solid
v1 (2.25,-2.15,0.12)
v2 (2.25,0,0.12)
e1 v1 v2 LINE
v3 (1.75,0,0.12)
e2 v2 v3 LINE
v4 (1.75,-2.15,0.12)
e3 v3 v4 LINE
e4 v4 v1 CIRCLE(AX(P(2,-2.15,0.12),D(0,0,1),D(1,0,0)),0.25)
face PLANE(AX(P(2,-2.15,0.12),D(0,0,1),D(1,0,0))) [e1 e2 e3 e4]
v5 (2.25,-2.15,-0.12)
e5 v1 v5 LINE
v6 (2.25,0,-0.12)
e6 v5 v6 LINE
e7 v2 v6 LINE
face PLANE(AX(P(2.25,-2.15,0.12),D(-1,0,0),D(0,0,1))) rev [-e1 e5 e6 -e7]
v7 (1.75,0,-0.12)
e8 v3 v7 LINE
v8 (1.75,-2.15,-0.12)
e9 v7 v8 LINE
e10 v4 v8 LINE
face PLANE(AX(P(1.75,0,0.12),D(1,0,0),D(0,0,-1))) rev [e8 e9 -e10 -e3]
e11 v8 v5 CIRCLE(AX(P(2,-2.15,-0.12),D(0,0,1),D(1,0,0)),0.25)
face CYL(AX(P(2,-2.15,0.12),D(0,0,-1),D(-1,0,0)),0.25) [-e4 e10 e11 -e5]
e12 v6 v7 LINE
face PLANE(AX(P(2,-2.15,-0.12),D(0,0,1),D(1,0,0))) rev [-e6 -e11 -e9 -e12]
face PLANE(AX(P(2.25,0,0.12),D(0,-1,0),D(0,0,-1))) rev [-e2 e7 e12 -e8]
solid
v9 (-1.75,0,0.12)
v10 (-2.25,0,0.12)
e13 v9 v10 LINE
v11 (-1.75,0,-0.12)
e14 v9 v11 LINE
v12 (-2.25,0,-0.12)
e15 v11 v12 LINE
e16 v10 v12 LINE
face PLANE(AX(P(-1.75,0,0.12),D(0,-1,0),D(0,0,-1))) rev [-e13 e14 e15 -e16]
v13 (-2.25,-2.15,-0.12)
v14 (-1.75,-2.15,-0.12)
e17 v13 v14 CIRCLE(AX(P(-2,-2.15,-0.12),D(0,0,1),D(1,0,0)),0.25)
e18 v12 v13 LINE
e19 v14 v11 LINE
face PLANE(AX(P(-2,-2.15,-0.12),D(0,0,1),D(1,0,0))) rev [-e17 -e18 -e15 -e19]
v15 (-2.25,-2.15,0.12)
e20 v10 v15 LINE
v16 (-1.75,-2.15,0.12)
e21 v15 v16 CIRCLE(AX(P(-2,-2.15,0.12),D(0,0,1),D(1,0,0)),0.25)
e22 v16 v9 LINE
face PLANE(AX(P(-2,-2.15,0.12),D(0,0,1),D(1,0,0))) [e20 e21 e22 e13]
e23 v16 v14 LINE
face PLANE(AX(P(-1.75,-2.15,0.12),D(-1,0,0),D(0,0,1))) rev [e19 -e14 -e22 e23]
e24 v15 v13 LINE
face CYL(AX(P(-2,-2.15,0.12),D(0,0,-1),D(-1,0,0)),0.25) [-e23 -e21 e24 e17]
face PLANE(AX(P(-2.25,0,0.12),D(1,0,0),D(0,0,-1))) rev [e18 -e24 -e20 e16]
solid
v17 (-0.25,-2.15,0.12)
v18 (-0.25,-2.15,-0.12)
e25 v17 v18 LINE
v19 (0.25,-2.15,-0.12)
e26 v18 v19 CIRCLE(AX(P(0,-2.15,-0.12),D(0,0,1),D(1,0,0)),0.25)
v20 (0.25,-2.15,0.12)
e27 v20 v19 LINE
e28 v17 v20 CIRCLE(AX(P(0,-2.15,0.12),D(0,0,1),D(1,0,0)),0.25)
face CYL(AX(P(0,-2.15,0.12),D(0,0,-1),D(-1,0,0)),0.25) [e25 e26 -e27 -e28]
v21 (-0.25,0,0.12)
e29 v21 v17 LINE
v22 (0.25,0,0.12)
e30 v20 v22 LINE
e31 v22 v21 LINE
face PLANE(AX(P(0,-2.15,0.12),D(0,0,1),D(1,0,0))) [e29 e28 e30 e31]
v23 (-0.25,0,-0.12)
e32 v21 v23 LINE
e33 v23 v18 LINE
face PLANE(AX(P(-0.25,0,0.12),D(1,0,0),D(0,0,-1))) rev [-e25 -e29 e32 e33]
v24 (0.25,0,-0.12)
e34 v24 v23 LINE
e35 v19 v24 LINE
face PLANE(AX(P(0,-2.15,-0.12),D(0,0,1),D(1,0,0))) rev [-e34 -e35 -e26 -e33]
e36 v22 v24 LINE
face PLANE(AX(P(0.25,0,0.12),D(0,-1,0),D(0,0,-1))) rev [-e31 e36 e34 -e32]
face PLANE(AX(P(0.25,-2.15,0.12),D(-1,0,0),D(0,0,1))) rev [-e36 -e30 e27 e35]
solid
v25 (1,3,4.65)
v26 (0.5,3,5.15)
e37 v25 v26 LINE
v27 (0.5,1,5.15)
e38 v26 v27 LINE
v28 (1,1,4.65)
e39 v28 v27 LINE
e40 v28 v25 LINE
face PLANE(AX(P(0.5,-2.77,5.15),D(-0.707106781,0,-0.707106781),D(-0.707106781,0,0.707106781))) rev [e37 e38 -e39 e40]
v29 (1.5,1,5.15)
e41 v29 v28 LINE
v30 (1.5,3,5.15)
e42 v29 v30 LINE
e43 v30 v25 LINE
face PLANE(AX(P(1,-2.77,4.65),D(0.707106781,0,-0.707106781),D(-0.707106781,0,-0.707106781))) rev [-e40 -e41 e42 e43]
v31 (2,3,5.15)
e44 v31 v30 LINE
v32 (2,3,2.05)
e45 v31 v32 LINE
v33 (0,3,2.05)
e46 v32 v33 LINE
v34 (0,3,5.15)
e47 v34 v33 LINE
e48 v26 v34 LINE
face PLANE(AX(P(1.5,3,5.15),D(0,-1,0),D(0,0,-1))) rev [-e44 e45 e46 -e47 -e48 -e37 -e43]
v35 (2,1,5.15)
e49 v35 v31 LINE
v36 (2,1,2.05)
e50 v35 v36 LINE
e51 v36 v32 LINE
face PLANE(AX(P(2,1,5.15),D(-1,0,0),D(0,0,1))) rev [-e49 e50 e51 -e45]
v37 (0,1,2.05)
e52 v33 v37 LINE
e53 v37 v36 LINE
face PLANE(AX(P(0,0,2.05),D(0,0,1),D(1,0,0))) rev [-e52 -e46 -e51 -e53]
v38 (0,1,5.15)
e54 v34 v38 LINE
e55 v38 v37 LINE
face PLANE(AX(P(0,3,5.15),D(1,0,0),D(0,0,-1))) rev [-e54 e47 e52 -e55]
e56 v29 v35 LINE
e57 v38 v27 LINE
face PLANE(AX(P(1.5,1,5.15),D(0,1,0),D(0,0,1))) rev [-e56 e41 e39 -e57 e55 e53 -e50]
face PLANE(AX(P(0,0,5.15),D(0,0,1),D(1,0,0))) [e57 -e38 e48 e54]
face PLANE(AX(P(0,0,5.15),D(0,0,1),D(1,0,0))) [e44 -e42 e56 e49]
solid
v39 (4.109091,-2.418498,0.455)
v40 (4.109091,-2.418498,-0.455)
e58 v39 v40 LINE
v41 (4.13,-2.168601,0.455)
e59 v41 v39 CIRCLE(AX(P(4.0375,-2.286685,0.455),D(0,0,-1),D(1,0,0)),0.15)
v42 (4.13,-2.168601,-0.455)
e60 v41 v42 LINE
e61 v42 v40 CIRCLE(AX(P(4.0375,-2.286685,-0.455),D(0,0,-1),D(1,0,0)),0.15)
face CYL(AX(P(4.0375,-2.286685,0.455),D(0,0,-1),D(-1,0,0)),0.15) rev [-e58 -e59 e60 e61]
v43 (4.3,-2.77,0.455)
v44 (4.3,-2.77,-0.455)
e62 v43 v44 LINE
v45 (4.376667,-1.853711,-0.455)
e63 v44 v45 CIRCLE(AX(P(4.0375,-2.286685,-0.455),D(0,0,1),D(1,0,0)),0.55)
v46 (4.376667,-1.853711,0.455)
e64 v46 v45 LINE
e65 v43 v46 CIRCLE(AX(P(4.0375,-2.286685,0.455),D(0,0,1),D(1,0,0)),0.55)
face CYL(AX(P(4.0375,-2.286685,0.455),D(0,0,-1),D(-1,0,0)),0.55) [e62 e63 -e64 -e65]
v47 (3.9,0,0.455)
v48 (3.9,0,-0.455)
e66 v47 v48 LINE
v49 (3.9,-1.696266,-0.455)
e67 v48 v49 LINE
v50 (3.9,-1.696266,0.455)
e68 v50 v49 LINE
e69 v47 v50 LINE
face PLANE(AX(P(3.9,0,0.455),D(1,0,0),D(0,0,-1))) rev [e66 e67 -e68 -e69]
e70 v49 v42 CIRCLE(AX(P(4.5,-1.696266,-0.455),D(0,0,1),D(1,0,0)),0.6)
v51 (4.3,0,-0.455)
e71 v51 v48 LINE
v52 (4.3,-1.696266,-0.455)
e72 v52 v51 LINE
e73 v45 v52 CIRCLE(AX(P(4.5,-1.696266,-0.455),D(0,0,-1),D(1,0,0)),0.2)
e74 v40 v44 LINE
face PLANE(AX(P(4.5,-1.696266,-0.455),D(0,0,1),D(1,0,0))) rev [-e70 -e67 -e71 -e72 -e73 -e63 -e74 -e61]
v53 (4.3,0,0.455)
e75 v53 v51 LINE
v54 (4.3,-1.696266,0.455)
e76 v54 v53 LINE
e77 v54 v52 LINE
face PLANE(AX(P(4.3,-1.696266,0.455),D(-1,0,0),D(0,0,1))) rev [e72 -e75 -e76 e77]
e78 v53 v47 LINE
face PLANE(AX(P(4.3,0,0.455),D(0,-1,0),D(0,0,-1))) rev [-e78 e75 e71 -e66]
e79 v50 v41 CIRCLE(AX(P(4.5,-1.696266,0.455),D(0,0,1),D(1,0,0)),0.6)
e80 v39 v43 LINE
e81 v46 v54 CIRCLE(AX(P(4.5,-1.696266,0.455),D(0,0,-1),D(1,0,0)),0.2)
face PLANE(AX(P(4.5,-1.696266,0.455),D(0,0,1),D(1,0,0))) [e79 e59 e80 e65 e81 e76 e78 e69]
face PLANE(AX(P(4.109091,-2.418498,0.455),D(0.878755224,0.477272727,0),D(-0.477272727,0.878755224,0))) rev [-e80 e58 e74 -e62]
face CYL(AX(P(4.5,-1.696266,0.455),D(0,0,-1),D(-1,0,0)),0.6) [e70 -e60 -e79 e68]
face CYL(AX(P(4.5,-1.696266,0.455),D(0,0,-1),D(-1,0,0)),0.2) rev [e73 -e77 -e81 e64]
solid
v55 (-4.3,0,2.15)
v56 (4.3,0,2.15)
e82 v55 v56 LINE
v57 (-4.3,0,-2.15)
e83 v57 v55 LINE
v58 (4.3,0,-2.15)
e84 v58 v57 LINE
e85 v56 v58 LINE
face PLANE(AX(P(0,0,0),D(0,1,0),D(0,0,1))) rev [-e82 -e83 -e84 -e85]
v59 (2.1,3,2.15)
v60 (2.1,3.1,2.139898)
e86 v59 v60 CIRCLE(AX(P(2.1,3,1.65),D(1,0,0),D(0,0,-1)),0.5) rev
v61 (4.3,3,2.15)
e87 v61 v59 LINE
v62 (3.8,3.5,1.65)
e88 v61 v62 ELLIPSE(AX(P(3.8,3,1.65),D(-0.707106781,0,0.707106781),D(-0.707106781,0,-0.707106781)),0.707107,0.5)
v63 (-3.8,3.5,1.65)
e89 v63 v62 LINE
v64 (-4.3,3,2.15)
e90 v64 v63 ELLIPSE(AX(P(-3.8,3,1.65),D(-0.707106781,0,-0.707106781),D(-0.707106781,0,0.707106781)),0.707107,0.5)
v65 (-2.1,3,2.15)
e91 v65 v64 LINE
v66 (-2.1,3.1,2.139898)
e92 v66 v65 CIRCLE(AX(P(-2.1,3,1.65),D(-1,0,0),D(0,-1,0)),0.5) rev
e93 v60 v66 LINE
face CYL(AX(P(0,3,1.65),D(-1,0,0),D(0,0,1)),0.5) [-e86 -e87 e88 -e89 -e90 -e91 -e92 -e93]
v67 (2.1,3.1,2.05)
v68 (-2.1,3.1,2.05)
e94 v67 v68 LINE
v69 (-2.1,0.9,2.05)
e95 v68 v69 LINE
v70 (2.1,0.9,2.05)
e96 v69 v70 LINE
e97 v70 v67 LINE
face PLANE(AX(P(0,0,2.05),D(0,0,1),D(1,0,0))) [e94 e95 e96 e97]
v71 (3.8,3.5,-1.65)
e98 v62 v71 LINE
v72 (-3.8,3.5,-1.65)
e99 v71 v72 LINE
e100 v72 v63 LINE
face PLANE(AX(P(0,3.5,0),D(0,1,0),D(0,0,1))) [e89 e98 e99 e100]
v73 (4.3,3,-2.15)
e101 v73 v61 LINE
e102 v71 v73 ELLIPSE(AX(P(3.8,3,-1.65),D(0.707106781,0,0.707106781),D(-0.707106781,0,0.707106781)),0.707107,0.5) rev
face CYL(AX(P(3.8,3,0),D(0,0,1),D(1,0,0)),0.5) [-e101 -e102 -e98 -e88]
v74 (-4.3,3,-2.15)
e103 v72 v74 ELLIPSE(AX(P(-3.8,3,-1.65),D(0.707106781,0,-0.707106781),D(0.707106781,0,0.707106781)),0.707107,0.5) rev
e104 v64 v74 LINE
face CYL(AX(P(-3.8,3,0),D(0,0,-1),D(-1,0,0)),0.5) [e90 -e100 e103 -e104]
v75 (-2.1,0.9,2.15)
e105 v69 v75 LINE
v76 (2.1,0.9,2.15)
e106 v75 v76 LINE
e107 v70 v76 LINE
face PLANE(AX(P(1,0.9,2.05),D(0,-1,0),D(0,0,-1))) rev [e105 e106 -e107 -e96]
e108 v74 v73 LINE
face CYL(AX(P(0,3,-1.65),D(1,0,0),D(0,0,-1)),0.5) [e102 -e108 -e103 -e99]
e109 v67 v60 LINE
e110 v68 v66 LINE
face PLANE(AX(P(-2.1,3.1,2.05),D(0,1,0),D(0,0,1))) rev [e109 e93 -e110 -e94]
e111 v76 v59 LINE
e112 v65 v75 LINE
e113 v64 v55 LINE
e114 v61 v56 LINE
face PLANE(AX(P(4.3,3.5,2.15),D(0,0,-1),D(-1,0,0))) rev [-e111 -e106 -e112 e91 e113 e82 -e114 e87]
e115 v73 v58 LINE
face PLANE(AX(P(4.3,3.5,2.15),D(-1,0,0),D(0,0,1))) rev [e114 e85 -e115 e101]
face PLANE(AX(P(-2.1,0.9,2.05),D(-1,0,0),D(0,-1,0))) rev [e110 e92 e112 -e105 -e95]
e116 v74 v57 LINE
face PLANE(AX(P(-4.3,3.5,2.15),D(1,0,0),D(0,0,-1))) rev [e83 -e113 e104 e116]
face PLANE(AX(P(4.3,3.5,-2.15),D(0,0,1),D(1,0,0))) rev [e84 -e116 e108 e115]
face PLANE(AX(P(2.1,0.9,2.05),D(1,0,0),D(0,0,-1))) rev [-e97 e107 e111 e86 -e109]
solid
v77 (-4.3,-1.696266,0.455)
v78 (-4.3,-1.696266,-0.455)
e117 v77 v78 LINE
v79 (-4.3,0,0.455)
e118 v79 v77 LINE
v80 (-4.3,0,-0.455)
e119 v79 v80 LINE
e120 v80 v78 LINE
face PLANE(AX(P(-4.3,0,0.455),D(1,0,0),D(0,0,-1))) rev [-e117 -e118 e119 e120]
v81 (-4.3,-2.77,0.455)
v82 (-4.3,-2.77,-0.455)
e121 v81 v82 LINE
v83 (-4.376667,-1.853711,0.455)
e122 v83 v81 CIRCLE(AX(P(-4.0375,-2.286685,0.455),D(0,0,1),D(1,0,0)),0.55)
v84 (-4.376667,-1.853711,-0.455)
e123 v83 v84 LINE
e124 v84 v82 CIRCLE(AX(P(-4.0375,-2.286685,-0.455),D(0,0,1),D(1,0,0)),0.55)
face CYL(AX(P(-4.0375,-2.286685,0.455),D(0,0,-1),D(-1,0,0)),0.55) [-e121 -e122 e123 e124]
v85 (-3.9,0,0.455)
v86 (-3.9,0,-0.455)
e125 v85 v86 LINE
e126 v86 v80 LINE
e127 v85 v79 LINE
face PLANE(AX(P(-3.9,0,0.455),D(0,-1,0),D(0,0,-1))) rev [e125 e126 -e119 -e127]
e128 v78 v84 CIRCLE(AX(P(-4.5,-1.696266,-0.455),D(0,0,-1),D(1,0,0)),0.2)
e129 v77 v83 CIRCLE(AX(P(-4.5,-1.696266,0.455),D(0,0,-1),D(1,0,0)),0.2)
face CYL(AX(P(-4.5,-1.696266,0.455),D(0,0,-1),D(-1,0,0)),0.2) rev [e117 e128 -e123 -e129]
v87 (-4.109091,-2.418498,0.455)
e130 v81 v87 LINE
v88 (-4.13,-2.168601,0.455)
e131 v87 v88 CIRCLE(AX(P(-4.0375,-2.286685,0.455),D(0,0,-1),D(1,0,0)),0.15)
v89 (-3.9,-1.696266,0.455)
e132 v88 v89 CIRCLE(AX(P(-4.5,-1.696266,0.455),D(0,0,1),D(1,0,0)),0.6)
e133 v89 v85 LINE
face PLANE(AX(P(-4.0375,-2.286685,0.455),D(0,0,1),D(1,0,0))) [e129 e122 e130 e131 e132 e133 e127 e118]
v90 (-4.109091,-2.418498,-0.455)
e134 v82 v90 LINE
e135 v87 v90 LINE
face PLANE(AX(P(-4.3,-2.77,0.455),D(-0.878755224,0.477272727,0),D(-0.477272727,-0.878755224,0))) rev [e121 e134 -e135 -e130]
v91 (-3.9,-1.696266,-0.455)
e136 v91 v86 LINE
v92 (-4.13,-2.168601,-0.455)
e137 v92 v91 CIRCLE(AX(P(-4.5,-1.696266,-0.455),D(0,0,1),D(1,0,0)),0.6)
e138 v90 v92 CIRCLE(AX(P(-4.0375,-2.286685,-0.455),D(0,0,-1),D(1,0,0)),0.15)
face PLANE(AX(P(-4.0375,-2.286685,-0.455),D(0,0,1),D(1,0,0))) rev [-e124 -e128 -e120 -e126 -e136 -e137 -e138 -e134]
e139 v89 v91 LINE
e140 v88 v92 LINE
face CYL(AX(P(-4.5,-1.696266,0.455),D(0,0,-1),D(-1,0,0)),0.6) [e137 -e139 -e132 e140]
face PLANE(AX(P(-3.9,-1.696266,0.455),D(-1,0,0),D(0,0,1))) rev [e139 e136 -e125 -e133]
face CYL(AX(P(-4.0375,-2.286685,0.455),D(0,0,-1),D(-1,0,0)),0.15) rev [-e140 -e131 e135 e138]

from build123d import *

# Parameters (mm, degrees)
SKETCH1_W             = 8.6
SKETCH1_H             = 4.3
BOSS_EXTRUDE1_DEPTH   = 3.5
BOSS_EXTRUDE2_DEPTH   = 0.455
BOSS_EXTRUDE2_2_DEPTH = 0.455
BOSS_EXTRUDE3_DEPTH   = 0.12
BOSS_EXTRUDE3_2_DEPTH = 0.12
BOSS_EXTRUDE3_3_DEPTH = 0.12
CUT_EXTRUDE1_DEPTH    = 0.1
BOSS_EXTRUDE4_DEPTH   = 3.1
CUT_EXTRUDE2_DEPTH    = 9.992249788
FILLET1_R             = 0.5


with BuildPart() as part:
    # Sketch1 → Boss-Extrude1 (new body)
    with BuildSketch(Plane(origin=(0, 0, 0), x_dir=(1, 0, 0), z_dir=(0, 1, 0))):
        Rectangle(SKETCH1_W, SKETCH1_H)
    extrude(amount=BOSS_EXTRUDE1_DEPTH)

    # Sketch4 → Cut-Extrude1 (cut)
    with BuildSketch(Plane.XY.offset(2.15)):
        Polygon((2.1, 0.9), (2.1, 3.1), (1.5, 3.1), (1, 3.1), (0.5, 3.1), (-0.5, 3.1), (-1, 3.1), (-1.5, 3.1), (-2.1, 3.1), (-2.1, 0.9), (-1.5, 0.9), (-1, 0.9), (-0.5, 0.9), (0.5, 0.9), (1, 0.9), (1.5, 0.9), align=None)
    extrude(amount=-CUT_EXTRUDE1_DEPTH, mode=Mode.SUBTRACT)

    # Fillet1
    # the kernel refuses this fillet: 0.5 mm, written as the material it takes off along each edge
    with BuildSketch(Plane(origin=(-4.3, 3.5, 3.4), x_dir=(1, 0, 0), z_dir=(0, 0, -1))) as fillet1_piece_1:
        with BuildLine():
            CenterArc((FILLET1_R, FILLET1_R), FILLET1_R, 180, 90)
            Line((0, FILLET1_R), (0, 0))
            Line((0, 0), (FILLET1_R, 0))
        make_face()
    extrude(amount=6.8, mode=Mode.SUBTRACT)
    with BuildSketch(Plane(origin=(-5.55, 3.5, -2.15), x_dir=(0, 0, 1), z_dir=(1, 0, 0))) as fillet1_piece_2:
        with BuildLine():
            CenterArc((FILLET1_R, FILLET1_R), FILLET1_R, 180, 90)
            Line((0, FILLET1_R), (0, 0))
            Line((0, 0), (FILLET1_R, 0))
        make_face()
    extrude(amount=11.1, mode=Mode.SUBTRACT)
    with BuildSketch(Plane(origin=(4.3, 3.5, -3.4), x_dir=(0, -1, 0), z_dir=(0, 0, 1))) as fillet1_piece_3:
        with BuildLine():
            CenterArc((FILLET1_R, -FILLET1_R), FILLET1_R, 90, 90)
            Line((0, -FILLET1_R), (0, 0))
            Line((0, 0), (FILLET1_R, 0))
        make_face()
    extrude(amount=6.8, mode=Mode.SUBTRACT)
    with BuildSketch(Plane(origin=(5.55, 3.5, 2.15), x_dir=(0, -1, 0), z_dir=(-1, 0, 0))) as fillet1_piece_4:
        with BuildLine():
            CenterArc((FILLET1_R, -FILLET1_R), FILLET1_R, 90, 90)
            Line((0, -FILLET1_R), (0, 0))
            Line((0, 0), (FILLET1_R, 0))
        make_face()
    extrude(amount=11.1, mode=Mode.SUBTRACT)


with BuildPart() as body_2:
    # Sketch2 → Boss-Extrude2 (new, symmetric)
    with BuildSketch(Plane.XY):
        with BuildLine():
            Line((3.9, 0), (3.9, -1.696266343))
            ThreePointArc((3.9, -1.696266343), (3.960555842, -1.958944854), (4.13, -2.16860097))
            ThreePointArc((4.13, -2.16860097), (4.18697768, -2.299191552), (4.109090909, -2.41849791))
            Line((4.109090909, -2.41849791), (4.3, -2.77))
            ThreePointArc((4.3, -2.77), (4.585584827, -2.332543353), (4.376666667, -1.853711219))
            ThreePointArc((4.376666667, -1.853711219), (4.320185281, -1.783825846), (4.3, -1.696266343))
            Line((4.3, -1.696266343), (4.3, 0))
            Line((4.3, 0), (3.9, 0))
        make_face()
    extrude(amount=BOSS_EXTRUDE2_DEPTH, both=True)


with BuildPart() as body_3:
    # Sketch2 → Boss-Extrude2 2 (new, symmetric)
    with BuildSketch(Plane.XY):
        with BuildLine():
            Line((-4.3, -2.77), (-4.109090909, -2.41849791))
            ThreePointArc((-4.109090909, -2.41849791), (-4.18697768, -2.299191552), (-4.13, -2.16860097))
            ThreePointArc((-4.13, -2.16860097), (-3.960555842, -1.958944854), (-3.9, -1.696266343))
            Line((-3.9, -1.696266343), (-3.9, 0))
            Line((-3.9, 0), (-4.3, 0))
            Line((-4.3, 0), (-4.3, -1.696266343))
            ThreePointArc((-4.3, -1.696266343), (-4.320185281, -1.783825846), (-4.376666667, -1.853711219))
            ThreePointArc((-4.376666667, -1.853711219), (-4.585584827, -2.332543353), (-4.3, -2.77))
        make_face()
    extrude(amount=BOSS_EXTRUDE2_2_DEPTH, both=True)


with BuildPart() as body_4:
    # Sketch3 → Boss-Extrude3 (new, symmetric)
    with BuildSketch(Plane.XY):
        with BuildLine():
            Line((2.25, -2.15), (2.25, 0))
            Line((2.25, 0), (1.75, 0))
            Line((1.75, 0), (1.75, -2.15))
            ThreePointArc((1.75, -2.15), (2, -2.4), (2.25, -2.15))
        make_face()
    extrude(amount=BOSS_EXTRUDE3_DEPTH, both=True)


with BuildPart() as body_5:
    # Sketch3 → Boss-Extrude3 2 (new, symmetric)
    with BuildSketch(Plane.XY):
        with BuildLine():
            Line((0.25, -2.15), (0.25, 0))
            Line((0.25, 0), (-0.25, 0))
            Line((-0.25, 0), (-0.25, -2.15))
            ThreePointArc((-0.25, -2.15), (0, -2.4), (0.25, -2.15))
        make_face()
    extrude(amount=BOSS_EXTRUDE3_2_DEPTH, both=True)


with BuildPart() as body_6:
    # Sketch3 → Boss-Extrude3 3 (new, symmetric)
    with BuildSketch(Plane.XY):
        with BuildLine():
            Line((-1.75, -2.15), (-1.75, 0))
            Line((-1.75, 0), (-2.25, 0))
            Line((-2.25, 0), (-2.25, -2.15))
            ThreePointArc((-2.25, -2.15), (-2, -2.4), (-1.75, -2.15))
        make_face()
    extrude(amount=BOSS_EXTRUDE3_3_DEPTH, both=True)


with BuildPart() as body_7:
    # Sketch5 → Boss-Extrude4 (new body)
    with BuildSketch(Plane.XY.offset(2.05)):
        Polygon((0.5, 3), (0, 3), (0, 1), (0.5, 1), (1, 1), (1.5, 1), (2, 1), (2, 3), (1.5, 3), (1, 3), align=None)
    extrude(amount=BOSS_EXTRUDE4_DEPTH)

    # Sketch6 → Cut-Extrude2 (cut, through all)
    with BuildSketch(Plane(origin=(0, 3, 0), x_dir=(1, 0, 0), z_dir=(0, 1, 0))):
        Polygon((0.5, -5.15), (1.5, -5.15), (1, -4.65), align=None)
    extrude(amount=-CUT_EXTRUDE2_DEPTH, mode=Mode.SUBTRACT)


solid = Compound([part.part, body_2.part, body_3.part, body_4.part, body_5.part, body_6.part, body_7.part])
